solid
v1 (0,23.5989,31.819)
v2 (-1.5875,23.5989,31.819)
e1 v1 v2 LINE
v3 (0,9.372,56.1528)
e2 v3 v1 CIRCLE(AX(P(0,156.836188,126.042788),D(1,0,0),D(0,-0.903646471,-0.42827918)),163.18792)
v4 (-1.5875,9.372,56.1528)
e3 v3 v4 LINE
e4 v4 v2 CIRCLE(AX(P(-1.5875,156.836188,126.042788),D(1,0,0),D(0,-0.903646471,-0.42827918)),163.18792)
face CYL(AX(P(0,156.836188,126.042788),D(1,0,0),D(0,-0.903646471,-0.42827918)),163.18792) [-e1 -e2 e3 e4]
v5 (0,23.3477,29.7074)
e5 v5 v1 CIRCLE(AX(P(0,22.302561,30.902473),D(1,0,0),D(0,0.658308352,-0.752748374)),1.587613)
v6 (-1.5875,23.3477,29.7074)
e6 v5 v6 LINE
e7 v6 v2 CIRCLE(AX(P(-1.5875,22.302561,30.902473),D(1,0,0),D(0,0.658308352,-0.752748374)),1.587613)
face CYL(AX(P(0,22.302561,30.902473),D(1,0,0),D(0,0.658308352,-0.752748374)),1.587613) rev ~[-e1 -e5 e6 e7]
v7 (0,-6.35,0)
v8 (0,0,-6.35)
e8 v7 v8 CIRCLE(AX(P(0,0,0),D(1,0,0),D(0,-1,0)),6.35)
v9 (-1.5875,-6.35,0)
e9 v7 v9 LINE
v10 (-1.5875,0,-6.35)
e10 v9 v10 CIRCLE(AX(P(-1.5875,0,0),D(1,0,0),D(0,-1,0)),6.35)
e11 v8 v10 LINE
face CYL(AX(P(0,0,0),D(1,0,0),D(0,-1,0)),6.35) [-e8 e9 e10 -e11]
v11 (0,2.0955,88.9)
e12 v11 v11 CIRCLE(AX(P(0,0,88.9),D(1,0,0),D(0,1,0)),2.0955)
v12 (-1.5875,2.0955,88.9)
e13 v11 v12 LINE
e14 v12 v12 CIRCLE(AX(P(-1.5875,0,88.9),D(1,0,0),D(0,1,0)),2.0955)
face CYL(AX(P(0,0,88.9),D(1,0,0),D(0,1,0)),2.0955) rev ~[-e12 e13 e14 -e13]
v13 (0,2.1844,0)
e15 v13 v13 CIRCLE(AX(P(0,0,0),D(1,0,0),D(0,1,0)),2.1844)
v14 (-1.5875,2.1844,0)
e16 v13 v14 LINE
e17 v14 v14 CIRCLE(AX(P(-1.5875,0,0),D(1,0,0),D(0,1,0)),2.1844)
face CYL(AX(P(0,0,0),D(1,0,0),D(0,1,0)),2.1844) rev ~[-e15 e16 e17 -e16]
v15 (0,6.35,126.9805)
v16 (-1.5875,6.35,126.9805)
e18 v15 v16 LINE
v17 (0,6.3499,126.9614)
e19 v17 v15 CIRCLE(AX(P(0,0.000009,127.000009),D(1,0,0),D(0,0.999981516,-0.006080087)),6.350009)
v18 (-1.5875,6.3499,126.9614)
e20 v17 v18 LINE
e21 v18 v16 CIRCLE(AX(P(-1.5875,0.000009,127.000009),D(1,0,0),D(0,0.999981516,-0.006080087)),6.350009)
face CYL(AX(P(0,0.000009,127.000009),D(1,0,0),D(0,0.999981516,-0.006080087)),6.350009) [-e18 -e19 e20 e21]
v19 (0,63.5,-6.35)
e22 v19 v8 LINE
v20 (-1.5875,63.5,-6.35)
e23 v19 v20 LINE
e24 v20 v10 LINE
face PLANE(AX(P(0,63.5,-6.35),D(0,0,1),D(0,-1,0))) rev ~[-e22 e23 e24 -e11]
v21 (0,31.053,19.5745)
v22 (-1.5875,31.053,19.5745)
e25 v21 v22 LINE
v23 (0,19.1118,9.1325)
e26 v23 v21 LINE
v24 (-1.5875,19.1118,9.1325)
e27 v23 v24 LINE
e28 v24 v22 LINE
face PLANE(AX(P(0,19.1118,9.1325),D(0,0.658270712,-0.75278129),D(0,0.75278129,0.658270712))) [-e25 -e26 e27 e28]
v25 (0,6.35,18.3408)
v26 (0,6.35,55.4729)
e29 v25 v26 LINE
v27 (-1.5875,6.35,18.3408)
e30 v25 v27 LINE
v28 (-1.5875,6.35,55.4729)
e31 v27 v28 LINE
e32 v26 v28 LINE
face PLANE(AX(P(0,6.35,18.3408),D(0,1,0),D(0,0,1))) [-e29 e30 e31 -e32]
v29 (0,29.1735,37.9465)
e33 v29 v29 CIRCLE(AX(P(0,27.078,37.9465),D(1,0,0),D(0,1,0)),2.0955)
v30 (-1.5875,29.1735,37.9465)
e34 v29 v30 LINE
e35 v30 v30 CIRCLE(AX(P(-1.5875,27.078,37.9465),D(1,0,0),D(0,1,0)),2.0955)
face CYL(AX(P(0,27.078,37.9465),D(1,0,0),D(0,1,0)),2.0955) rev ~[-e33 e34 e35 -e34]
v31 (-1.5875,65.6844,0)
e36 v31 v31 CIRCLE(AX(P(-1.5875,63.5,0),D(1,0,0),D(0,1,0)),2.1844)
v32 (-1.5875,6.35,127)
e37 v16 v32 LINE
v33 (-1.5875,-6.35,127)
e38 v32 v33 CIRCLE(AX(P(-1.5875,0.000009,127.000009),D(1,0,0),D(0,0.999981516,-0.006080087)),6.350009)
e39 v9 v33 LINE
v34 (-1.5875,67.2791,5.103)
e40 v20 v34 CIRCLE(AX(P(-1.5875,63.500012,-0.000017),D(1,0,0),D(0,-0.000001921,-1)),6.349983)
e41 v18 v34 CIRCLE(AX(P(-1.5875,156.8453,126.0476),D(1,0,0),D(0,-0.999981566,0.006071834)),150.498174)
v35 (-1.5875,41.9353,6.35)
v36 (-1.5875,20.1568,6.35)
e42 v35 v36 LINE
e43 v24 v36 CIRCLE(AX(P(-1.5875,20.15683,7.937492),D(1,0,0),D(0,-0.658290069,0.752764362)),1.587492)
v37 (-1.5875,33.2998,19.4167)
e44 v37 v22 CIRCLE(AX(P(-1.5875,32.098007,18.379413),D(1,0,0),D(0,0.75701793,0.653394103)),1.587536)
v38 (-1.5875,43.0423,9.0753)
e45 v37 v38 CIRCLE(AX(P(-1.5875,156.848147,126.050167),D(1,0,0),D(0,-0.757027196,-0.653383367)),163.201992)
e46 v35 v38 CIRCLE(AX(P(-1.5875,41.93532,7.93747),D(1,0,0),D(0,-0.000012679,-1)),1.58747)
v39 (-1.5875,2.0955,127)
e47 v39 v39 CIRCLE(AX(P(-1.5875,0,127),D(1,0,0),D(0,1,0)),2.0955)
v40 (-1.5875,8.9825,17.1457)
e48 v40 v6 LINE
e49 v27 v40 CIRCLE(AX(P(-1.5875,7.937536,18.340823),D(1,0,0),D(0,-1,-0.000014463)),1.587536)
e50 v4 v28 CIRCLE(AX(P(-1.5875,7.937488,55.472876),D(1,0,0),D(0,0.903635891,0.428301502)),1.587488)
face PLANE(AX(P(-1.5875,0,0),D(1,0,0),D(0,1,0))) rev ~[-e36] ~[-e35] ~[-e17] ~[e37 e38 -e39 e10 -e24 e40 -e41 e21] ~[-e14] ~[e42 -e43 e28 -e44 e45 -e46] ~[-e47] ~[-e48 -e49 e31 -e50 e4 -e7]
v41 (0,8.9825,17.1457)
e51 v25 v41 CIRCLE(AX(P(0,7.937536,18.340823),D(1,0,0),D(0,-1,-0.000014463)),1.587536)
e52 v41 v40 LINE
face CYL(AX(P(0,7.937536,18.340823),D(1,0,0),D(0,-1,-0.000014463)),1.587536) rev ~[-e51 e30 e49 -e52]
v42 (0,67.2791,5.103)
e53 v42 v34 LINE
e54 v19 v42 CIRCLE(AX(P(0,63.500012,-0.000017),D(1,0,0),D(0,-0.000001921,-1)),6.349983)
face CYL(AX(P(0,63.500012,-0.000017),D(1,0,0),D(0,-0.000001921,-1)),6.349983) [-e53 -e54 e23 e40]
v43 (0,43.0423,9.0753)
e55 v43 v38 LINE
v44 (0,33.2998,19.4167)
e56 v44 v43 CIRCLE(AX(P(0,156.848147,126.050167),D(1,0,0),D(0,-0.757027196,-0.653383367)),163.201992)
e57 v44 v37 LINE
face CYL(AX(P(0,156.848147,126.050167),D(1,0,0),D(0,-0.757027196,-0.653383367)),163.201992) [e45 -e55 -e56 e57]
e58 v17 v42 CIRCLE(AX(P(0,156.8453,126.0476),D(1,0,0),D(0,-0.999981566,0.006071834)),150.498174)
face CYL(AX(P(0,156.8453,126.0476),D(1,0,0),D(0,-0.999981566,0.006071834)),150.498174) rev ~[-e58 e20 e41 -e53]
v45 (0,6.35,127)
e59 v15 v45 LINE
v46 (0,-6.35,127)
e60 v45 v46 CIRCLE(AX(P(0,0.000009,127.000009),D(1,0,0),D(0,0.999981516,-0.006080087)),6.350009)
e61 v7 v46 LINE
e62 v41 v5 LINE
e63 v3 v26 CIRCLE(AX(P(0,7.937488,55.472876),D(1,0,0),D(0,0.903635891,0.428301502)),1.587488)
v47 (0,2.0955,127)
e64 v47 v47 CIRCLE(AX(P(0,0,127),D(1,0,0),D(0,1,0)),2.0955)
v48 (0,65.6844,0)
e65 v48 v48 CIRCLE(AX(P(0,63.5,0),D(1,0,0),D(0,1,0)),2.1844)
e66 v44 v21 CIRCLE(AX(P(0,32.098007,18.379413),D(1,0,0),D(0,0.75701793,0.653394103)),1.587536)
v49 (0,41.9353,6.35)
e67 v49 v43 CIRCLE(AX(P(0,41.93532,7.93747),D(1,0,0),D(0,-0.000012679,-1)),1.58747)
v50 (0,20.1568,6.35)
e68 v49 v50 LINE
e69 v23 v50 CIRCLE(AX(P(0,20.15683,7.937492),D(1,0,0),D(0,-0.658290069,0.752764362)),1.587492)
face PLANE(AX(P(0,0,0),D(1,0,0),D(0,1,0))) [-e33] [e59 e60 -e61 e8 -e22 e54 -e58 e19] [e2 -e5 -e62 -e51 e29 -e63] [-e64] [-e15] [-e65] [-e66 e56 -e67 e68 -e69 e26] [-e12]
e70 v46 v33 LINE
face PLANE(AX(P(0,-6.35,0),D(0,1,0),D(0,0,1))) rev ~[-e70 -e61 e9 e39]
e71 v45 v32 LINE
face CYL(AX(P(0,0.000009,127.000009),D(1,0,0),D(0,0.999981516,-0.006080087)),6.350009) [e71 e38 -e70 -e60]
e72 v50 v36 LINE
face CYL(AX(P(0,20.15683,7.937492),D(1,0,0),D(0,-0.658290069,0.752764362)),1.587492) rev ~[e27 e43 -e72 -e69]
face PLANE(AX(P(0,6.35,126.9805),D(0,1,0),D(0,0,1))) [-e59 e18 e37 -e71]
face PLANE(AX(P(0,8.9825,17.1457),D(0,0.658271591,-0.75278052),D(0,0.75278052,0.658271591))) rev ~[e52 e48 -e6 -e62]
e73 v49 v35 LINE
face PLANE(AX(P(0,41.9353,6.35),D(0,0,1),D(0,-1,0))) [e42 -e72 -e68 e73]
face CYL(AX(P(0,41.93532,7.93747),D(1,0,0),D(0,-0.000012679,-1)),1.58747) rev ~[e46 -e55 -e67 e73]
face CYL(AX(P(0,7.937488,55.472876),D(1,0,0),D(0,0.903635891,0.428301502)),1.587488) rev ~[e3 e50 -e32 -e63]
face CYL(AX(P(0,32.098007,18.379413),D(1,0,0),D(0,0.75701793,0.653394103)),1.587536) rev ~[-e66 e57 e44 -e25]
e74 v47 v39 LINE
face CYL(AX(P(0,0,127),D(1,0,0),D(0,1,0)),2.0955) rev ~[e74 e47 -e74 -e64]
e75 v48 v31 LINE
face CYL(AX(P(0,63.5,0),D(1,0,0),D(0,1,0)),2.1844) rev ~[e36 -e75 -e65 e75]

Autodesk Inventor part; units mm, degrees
ref_plane "YZ Plane" through (0, 0, 0) normal (1, 0, 0) x (0, 1, 0)
ref_plane "XZ Plane" through (0, 0, 0) normal (0, 1, 0) x (-1, 0, 0)
ref_plane "XY Plane" through (0, 0, 0) normal (0, 0, 1) x (1, 0, 0)
sketch "main" plane through (0, 0, 0) normal (0, 0, 1) x (1, 0, 0)
  circle A0 centre (-72.2021, -58.7899) radius 2.1844
  circle A1 centre (-8.7021, -58.7899) radius 2.1844
  circle A2 centre (-72.2021, 68.2101) radius 2.0955
  arc A3 (-65.8522, 68.1715) -> (-78.5521, 68.2101) centre (-72.2021, 68.2101) ccw
  arc A4 (-78.5521, -58.7899) -> (-72.2021, -65.1399) centre (-72.2021, -58.7899) ccw
  arc A5 (-8.7021, -65.1399) -> (-4.923, -53.6869) centre (-8.7021, -58.7899) ccw
  line L0 (-8.7021, -65.1399) -> (-72.2021, -65.1399)
  line L1 (-78.5521, -58.7899) -> (-78.5521, 68.2101)
  arc A6 (-65.8522, 68.1715) -> (-4.923, -53.6869) centre (84.6432, 67.2577) ccw
  circle A7 centre (-45.1241, -20.8434) radius 2.0955
  circle A8 centre (-72.2021, 30.1101) radius 2.0955
  line L2 (-30.2668, -52.4399) -> (-52.0453, -52.4399)
  line L3 (-65.8521, -40.4491) -> (-65.8521, -3.317)
  line L4 (-65.8521, 68.1906) -> (-65.8521, 68.2101)
  arc A9 (-30.2668, -52.4399) -> (-29.1598, -49.7146) centre (-30.2668, -50.8524) ccw
  arc A10 (-62.8301, -2.6371) -> (-65.8521, -3.317) centre (-64.2646, -3.317) ccw
  line L5 (-63.2196, -41.6442) -> (-48.8544, -29.0826)
  line L6 (-53.0903, -49.6574) -> (-41.1491, -39.2154)
  arc A11 (-62.8301, -2.6371) -> (-48.6032, -26.9709) centre (84.6432, 67.2577) ccw
  arc A12 (-38.9023, -39.3732) -> (-29.1598, -49.7146) centre (84.6432, 67.2577) ccw
  arc A13 (-48.8544, -29.0826) -> (-48.6032, -26.9709) centre (-49.8994, -27.8875) ccw
  arc A14 (-65.8521, -40.4491) -> (-63.2196, -41.6442) centre (-64.2646, -40.4491) ccw
  arc A15 (-53.0903, -49.6574) -> (-52.0453, -52.4399) centre (-52.0453, -50.8524) ccw
  arc A16 (-38.9023, -39.3732) -> (-41.1491, -39.2154) centre (-40.1041, -40.4105) ccw
  point P0 (-46.4652, -14.2849)
  point P1 (-26.2898, -52.4399)
  point P2 (-65.8521, 4.1323)
  point P3 (-47.7717, -28.1358)
  point P4 (-39.9404, -38.1585)
  point P5 (-65.3871, -51.9749)
  dimension "d0" = 4.191
  dimension "d1" = 12.7
  dimension "d3" = 4.191
  dimension "d4" = 4.191
  dimension "d8" = 1.5875
  dimension "d9" = 12.7
  dimension "d10" = 6.35
  dimension "d11" = 1.5875
sketch "Sketch1" plane through (0, 0, 0) normal (1, 0, 0) x (0, 1, 0)
  circle A0 centre (0, 0) radius 2.1844
  circle A1 centre (63.5, 0) radius 2.1844
  circle A2 centre (0, 127) radius 2.0955
  arc A3 (6.3499, 126.9614) -> (-6.35, 127) centre (0, 127) ccw
  arc A4 (-6.35, 0) -> (0, -6.35) centre (0, 0) ccw
  arc A5 (63.5, -6.35) -> (67.2791, 5.103) centre (63.5, 0) ccw
  line L0 (63.5, -6.35) -> (0, -6.35)
  line L1 (-6.35, 0) -> (-6.35, 127)
  arc A6 (6.3499, 126.9614) -> (67.2791, 5.103) centre (156.8453, 126.0476) ccw
  circle A7 centre (27.078, 37.9465) radius 2.0955
  circle A8 centre (0, 88.9) radius 2.0955
  line L2 (41.9353, 6.35) -> (20.1568, 6.35)
  line L3 (6.35, 18.3408) -> (6.35, 55.4729)
  line L4 (6.35, 126.9805) -> (6.35, 127)
  arc A9 (41.9353, 6.35) -> (43.0423, 9.0753) centre (41.9353, 7.9375) ccw
  arc A10 (9.372, 56.1528) -> (6.35, 55.4729) centre (7.9375, 55.4729) ccw
  line L5 (8.9825, 17.1457) -> (23.3477, 29.7074)
  line L6 (19.1118, 9.1325) -> (31.053, 19.5745)
  arc A11 (9.372, 56.1528) -> (23.5989, 31.819) centre (156.8453, 126.0476) ccw
  arc A12 (33.2998, 19.4167) -> (43.0423, 9.0753) centre (156.8453, 126.0476) ccw
  arc A13 (23.3477, 29.7074) -> (23.5989, 31.819) centre (22.3027, 30.9024) ccw
  arc A14 (6.35, 18.3408) -> (8.9825, 17.1457) centre (7.9375, 18.3408) ccw
  arc A15 (19.1118, 9.1325) -> (20.1568, 6.35) centre (20.1568, 7.9375) ccw
  arc A16 (33.2998, 19.4167) -> (31.053, 19.5745) centre (32.098, 18.3794) ccw
extrude "Extrusion1" add sketch "Sketch1" against normal blind 1.5875
properties part number "Scoop Gusset" material "Acetal Resin, White"
